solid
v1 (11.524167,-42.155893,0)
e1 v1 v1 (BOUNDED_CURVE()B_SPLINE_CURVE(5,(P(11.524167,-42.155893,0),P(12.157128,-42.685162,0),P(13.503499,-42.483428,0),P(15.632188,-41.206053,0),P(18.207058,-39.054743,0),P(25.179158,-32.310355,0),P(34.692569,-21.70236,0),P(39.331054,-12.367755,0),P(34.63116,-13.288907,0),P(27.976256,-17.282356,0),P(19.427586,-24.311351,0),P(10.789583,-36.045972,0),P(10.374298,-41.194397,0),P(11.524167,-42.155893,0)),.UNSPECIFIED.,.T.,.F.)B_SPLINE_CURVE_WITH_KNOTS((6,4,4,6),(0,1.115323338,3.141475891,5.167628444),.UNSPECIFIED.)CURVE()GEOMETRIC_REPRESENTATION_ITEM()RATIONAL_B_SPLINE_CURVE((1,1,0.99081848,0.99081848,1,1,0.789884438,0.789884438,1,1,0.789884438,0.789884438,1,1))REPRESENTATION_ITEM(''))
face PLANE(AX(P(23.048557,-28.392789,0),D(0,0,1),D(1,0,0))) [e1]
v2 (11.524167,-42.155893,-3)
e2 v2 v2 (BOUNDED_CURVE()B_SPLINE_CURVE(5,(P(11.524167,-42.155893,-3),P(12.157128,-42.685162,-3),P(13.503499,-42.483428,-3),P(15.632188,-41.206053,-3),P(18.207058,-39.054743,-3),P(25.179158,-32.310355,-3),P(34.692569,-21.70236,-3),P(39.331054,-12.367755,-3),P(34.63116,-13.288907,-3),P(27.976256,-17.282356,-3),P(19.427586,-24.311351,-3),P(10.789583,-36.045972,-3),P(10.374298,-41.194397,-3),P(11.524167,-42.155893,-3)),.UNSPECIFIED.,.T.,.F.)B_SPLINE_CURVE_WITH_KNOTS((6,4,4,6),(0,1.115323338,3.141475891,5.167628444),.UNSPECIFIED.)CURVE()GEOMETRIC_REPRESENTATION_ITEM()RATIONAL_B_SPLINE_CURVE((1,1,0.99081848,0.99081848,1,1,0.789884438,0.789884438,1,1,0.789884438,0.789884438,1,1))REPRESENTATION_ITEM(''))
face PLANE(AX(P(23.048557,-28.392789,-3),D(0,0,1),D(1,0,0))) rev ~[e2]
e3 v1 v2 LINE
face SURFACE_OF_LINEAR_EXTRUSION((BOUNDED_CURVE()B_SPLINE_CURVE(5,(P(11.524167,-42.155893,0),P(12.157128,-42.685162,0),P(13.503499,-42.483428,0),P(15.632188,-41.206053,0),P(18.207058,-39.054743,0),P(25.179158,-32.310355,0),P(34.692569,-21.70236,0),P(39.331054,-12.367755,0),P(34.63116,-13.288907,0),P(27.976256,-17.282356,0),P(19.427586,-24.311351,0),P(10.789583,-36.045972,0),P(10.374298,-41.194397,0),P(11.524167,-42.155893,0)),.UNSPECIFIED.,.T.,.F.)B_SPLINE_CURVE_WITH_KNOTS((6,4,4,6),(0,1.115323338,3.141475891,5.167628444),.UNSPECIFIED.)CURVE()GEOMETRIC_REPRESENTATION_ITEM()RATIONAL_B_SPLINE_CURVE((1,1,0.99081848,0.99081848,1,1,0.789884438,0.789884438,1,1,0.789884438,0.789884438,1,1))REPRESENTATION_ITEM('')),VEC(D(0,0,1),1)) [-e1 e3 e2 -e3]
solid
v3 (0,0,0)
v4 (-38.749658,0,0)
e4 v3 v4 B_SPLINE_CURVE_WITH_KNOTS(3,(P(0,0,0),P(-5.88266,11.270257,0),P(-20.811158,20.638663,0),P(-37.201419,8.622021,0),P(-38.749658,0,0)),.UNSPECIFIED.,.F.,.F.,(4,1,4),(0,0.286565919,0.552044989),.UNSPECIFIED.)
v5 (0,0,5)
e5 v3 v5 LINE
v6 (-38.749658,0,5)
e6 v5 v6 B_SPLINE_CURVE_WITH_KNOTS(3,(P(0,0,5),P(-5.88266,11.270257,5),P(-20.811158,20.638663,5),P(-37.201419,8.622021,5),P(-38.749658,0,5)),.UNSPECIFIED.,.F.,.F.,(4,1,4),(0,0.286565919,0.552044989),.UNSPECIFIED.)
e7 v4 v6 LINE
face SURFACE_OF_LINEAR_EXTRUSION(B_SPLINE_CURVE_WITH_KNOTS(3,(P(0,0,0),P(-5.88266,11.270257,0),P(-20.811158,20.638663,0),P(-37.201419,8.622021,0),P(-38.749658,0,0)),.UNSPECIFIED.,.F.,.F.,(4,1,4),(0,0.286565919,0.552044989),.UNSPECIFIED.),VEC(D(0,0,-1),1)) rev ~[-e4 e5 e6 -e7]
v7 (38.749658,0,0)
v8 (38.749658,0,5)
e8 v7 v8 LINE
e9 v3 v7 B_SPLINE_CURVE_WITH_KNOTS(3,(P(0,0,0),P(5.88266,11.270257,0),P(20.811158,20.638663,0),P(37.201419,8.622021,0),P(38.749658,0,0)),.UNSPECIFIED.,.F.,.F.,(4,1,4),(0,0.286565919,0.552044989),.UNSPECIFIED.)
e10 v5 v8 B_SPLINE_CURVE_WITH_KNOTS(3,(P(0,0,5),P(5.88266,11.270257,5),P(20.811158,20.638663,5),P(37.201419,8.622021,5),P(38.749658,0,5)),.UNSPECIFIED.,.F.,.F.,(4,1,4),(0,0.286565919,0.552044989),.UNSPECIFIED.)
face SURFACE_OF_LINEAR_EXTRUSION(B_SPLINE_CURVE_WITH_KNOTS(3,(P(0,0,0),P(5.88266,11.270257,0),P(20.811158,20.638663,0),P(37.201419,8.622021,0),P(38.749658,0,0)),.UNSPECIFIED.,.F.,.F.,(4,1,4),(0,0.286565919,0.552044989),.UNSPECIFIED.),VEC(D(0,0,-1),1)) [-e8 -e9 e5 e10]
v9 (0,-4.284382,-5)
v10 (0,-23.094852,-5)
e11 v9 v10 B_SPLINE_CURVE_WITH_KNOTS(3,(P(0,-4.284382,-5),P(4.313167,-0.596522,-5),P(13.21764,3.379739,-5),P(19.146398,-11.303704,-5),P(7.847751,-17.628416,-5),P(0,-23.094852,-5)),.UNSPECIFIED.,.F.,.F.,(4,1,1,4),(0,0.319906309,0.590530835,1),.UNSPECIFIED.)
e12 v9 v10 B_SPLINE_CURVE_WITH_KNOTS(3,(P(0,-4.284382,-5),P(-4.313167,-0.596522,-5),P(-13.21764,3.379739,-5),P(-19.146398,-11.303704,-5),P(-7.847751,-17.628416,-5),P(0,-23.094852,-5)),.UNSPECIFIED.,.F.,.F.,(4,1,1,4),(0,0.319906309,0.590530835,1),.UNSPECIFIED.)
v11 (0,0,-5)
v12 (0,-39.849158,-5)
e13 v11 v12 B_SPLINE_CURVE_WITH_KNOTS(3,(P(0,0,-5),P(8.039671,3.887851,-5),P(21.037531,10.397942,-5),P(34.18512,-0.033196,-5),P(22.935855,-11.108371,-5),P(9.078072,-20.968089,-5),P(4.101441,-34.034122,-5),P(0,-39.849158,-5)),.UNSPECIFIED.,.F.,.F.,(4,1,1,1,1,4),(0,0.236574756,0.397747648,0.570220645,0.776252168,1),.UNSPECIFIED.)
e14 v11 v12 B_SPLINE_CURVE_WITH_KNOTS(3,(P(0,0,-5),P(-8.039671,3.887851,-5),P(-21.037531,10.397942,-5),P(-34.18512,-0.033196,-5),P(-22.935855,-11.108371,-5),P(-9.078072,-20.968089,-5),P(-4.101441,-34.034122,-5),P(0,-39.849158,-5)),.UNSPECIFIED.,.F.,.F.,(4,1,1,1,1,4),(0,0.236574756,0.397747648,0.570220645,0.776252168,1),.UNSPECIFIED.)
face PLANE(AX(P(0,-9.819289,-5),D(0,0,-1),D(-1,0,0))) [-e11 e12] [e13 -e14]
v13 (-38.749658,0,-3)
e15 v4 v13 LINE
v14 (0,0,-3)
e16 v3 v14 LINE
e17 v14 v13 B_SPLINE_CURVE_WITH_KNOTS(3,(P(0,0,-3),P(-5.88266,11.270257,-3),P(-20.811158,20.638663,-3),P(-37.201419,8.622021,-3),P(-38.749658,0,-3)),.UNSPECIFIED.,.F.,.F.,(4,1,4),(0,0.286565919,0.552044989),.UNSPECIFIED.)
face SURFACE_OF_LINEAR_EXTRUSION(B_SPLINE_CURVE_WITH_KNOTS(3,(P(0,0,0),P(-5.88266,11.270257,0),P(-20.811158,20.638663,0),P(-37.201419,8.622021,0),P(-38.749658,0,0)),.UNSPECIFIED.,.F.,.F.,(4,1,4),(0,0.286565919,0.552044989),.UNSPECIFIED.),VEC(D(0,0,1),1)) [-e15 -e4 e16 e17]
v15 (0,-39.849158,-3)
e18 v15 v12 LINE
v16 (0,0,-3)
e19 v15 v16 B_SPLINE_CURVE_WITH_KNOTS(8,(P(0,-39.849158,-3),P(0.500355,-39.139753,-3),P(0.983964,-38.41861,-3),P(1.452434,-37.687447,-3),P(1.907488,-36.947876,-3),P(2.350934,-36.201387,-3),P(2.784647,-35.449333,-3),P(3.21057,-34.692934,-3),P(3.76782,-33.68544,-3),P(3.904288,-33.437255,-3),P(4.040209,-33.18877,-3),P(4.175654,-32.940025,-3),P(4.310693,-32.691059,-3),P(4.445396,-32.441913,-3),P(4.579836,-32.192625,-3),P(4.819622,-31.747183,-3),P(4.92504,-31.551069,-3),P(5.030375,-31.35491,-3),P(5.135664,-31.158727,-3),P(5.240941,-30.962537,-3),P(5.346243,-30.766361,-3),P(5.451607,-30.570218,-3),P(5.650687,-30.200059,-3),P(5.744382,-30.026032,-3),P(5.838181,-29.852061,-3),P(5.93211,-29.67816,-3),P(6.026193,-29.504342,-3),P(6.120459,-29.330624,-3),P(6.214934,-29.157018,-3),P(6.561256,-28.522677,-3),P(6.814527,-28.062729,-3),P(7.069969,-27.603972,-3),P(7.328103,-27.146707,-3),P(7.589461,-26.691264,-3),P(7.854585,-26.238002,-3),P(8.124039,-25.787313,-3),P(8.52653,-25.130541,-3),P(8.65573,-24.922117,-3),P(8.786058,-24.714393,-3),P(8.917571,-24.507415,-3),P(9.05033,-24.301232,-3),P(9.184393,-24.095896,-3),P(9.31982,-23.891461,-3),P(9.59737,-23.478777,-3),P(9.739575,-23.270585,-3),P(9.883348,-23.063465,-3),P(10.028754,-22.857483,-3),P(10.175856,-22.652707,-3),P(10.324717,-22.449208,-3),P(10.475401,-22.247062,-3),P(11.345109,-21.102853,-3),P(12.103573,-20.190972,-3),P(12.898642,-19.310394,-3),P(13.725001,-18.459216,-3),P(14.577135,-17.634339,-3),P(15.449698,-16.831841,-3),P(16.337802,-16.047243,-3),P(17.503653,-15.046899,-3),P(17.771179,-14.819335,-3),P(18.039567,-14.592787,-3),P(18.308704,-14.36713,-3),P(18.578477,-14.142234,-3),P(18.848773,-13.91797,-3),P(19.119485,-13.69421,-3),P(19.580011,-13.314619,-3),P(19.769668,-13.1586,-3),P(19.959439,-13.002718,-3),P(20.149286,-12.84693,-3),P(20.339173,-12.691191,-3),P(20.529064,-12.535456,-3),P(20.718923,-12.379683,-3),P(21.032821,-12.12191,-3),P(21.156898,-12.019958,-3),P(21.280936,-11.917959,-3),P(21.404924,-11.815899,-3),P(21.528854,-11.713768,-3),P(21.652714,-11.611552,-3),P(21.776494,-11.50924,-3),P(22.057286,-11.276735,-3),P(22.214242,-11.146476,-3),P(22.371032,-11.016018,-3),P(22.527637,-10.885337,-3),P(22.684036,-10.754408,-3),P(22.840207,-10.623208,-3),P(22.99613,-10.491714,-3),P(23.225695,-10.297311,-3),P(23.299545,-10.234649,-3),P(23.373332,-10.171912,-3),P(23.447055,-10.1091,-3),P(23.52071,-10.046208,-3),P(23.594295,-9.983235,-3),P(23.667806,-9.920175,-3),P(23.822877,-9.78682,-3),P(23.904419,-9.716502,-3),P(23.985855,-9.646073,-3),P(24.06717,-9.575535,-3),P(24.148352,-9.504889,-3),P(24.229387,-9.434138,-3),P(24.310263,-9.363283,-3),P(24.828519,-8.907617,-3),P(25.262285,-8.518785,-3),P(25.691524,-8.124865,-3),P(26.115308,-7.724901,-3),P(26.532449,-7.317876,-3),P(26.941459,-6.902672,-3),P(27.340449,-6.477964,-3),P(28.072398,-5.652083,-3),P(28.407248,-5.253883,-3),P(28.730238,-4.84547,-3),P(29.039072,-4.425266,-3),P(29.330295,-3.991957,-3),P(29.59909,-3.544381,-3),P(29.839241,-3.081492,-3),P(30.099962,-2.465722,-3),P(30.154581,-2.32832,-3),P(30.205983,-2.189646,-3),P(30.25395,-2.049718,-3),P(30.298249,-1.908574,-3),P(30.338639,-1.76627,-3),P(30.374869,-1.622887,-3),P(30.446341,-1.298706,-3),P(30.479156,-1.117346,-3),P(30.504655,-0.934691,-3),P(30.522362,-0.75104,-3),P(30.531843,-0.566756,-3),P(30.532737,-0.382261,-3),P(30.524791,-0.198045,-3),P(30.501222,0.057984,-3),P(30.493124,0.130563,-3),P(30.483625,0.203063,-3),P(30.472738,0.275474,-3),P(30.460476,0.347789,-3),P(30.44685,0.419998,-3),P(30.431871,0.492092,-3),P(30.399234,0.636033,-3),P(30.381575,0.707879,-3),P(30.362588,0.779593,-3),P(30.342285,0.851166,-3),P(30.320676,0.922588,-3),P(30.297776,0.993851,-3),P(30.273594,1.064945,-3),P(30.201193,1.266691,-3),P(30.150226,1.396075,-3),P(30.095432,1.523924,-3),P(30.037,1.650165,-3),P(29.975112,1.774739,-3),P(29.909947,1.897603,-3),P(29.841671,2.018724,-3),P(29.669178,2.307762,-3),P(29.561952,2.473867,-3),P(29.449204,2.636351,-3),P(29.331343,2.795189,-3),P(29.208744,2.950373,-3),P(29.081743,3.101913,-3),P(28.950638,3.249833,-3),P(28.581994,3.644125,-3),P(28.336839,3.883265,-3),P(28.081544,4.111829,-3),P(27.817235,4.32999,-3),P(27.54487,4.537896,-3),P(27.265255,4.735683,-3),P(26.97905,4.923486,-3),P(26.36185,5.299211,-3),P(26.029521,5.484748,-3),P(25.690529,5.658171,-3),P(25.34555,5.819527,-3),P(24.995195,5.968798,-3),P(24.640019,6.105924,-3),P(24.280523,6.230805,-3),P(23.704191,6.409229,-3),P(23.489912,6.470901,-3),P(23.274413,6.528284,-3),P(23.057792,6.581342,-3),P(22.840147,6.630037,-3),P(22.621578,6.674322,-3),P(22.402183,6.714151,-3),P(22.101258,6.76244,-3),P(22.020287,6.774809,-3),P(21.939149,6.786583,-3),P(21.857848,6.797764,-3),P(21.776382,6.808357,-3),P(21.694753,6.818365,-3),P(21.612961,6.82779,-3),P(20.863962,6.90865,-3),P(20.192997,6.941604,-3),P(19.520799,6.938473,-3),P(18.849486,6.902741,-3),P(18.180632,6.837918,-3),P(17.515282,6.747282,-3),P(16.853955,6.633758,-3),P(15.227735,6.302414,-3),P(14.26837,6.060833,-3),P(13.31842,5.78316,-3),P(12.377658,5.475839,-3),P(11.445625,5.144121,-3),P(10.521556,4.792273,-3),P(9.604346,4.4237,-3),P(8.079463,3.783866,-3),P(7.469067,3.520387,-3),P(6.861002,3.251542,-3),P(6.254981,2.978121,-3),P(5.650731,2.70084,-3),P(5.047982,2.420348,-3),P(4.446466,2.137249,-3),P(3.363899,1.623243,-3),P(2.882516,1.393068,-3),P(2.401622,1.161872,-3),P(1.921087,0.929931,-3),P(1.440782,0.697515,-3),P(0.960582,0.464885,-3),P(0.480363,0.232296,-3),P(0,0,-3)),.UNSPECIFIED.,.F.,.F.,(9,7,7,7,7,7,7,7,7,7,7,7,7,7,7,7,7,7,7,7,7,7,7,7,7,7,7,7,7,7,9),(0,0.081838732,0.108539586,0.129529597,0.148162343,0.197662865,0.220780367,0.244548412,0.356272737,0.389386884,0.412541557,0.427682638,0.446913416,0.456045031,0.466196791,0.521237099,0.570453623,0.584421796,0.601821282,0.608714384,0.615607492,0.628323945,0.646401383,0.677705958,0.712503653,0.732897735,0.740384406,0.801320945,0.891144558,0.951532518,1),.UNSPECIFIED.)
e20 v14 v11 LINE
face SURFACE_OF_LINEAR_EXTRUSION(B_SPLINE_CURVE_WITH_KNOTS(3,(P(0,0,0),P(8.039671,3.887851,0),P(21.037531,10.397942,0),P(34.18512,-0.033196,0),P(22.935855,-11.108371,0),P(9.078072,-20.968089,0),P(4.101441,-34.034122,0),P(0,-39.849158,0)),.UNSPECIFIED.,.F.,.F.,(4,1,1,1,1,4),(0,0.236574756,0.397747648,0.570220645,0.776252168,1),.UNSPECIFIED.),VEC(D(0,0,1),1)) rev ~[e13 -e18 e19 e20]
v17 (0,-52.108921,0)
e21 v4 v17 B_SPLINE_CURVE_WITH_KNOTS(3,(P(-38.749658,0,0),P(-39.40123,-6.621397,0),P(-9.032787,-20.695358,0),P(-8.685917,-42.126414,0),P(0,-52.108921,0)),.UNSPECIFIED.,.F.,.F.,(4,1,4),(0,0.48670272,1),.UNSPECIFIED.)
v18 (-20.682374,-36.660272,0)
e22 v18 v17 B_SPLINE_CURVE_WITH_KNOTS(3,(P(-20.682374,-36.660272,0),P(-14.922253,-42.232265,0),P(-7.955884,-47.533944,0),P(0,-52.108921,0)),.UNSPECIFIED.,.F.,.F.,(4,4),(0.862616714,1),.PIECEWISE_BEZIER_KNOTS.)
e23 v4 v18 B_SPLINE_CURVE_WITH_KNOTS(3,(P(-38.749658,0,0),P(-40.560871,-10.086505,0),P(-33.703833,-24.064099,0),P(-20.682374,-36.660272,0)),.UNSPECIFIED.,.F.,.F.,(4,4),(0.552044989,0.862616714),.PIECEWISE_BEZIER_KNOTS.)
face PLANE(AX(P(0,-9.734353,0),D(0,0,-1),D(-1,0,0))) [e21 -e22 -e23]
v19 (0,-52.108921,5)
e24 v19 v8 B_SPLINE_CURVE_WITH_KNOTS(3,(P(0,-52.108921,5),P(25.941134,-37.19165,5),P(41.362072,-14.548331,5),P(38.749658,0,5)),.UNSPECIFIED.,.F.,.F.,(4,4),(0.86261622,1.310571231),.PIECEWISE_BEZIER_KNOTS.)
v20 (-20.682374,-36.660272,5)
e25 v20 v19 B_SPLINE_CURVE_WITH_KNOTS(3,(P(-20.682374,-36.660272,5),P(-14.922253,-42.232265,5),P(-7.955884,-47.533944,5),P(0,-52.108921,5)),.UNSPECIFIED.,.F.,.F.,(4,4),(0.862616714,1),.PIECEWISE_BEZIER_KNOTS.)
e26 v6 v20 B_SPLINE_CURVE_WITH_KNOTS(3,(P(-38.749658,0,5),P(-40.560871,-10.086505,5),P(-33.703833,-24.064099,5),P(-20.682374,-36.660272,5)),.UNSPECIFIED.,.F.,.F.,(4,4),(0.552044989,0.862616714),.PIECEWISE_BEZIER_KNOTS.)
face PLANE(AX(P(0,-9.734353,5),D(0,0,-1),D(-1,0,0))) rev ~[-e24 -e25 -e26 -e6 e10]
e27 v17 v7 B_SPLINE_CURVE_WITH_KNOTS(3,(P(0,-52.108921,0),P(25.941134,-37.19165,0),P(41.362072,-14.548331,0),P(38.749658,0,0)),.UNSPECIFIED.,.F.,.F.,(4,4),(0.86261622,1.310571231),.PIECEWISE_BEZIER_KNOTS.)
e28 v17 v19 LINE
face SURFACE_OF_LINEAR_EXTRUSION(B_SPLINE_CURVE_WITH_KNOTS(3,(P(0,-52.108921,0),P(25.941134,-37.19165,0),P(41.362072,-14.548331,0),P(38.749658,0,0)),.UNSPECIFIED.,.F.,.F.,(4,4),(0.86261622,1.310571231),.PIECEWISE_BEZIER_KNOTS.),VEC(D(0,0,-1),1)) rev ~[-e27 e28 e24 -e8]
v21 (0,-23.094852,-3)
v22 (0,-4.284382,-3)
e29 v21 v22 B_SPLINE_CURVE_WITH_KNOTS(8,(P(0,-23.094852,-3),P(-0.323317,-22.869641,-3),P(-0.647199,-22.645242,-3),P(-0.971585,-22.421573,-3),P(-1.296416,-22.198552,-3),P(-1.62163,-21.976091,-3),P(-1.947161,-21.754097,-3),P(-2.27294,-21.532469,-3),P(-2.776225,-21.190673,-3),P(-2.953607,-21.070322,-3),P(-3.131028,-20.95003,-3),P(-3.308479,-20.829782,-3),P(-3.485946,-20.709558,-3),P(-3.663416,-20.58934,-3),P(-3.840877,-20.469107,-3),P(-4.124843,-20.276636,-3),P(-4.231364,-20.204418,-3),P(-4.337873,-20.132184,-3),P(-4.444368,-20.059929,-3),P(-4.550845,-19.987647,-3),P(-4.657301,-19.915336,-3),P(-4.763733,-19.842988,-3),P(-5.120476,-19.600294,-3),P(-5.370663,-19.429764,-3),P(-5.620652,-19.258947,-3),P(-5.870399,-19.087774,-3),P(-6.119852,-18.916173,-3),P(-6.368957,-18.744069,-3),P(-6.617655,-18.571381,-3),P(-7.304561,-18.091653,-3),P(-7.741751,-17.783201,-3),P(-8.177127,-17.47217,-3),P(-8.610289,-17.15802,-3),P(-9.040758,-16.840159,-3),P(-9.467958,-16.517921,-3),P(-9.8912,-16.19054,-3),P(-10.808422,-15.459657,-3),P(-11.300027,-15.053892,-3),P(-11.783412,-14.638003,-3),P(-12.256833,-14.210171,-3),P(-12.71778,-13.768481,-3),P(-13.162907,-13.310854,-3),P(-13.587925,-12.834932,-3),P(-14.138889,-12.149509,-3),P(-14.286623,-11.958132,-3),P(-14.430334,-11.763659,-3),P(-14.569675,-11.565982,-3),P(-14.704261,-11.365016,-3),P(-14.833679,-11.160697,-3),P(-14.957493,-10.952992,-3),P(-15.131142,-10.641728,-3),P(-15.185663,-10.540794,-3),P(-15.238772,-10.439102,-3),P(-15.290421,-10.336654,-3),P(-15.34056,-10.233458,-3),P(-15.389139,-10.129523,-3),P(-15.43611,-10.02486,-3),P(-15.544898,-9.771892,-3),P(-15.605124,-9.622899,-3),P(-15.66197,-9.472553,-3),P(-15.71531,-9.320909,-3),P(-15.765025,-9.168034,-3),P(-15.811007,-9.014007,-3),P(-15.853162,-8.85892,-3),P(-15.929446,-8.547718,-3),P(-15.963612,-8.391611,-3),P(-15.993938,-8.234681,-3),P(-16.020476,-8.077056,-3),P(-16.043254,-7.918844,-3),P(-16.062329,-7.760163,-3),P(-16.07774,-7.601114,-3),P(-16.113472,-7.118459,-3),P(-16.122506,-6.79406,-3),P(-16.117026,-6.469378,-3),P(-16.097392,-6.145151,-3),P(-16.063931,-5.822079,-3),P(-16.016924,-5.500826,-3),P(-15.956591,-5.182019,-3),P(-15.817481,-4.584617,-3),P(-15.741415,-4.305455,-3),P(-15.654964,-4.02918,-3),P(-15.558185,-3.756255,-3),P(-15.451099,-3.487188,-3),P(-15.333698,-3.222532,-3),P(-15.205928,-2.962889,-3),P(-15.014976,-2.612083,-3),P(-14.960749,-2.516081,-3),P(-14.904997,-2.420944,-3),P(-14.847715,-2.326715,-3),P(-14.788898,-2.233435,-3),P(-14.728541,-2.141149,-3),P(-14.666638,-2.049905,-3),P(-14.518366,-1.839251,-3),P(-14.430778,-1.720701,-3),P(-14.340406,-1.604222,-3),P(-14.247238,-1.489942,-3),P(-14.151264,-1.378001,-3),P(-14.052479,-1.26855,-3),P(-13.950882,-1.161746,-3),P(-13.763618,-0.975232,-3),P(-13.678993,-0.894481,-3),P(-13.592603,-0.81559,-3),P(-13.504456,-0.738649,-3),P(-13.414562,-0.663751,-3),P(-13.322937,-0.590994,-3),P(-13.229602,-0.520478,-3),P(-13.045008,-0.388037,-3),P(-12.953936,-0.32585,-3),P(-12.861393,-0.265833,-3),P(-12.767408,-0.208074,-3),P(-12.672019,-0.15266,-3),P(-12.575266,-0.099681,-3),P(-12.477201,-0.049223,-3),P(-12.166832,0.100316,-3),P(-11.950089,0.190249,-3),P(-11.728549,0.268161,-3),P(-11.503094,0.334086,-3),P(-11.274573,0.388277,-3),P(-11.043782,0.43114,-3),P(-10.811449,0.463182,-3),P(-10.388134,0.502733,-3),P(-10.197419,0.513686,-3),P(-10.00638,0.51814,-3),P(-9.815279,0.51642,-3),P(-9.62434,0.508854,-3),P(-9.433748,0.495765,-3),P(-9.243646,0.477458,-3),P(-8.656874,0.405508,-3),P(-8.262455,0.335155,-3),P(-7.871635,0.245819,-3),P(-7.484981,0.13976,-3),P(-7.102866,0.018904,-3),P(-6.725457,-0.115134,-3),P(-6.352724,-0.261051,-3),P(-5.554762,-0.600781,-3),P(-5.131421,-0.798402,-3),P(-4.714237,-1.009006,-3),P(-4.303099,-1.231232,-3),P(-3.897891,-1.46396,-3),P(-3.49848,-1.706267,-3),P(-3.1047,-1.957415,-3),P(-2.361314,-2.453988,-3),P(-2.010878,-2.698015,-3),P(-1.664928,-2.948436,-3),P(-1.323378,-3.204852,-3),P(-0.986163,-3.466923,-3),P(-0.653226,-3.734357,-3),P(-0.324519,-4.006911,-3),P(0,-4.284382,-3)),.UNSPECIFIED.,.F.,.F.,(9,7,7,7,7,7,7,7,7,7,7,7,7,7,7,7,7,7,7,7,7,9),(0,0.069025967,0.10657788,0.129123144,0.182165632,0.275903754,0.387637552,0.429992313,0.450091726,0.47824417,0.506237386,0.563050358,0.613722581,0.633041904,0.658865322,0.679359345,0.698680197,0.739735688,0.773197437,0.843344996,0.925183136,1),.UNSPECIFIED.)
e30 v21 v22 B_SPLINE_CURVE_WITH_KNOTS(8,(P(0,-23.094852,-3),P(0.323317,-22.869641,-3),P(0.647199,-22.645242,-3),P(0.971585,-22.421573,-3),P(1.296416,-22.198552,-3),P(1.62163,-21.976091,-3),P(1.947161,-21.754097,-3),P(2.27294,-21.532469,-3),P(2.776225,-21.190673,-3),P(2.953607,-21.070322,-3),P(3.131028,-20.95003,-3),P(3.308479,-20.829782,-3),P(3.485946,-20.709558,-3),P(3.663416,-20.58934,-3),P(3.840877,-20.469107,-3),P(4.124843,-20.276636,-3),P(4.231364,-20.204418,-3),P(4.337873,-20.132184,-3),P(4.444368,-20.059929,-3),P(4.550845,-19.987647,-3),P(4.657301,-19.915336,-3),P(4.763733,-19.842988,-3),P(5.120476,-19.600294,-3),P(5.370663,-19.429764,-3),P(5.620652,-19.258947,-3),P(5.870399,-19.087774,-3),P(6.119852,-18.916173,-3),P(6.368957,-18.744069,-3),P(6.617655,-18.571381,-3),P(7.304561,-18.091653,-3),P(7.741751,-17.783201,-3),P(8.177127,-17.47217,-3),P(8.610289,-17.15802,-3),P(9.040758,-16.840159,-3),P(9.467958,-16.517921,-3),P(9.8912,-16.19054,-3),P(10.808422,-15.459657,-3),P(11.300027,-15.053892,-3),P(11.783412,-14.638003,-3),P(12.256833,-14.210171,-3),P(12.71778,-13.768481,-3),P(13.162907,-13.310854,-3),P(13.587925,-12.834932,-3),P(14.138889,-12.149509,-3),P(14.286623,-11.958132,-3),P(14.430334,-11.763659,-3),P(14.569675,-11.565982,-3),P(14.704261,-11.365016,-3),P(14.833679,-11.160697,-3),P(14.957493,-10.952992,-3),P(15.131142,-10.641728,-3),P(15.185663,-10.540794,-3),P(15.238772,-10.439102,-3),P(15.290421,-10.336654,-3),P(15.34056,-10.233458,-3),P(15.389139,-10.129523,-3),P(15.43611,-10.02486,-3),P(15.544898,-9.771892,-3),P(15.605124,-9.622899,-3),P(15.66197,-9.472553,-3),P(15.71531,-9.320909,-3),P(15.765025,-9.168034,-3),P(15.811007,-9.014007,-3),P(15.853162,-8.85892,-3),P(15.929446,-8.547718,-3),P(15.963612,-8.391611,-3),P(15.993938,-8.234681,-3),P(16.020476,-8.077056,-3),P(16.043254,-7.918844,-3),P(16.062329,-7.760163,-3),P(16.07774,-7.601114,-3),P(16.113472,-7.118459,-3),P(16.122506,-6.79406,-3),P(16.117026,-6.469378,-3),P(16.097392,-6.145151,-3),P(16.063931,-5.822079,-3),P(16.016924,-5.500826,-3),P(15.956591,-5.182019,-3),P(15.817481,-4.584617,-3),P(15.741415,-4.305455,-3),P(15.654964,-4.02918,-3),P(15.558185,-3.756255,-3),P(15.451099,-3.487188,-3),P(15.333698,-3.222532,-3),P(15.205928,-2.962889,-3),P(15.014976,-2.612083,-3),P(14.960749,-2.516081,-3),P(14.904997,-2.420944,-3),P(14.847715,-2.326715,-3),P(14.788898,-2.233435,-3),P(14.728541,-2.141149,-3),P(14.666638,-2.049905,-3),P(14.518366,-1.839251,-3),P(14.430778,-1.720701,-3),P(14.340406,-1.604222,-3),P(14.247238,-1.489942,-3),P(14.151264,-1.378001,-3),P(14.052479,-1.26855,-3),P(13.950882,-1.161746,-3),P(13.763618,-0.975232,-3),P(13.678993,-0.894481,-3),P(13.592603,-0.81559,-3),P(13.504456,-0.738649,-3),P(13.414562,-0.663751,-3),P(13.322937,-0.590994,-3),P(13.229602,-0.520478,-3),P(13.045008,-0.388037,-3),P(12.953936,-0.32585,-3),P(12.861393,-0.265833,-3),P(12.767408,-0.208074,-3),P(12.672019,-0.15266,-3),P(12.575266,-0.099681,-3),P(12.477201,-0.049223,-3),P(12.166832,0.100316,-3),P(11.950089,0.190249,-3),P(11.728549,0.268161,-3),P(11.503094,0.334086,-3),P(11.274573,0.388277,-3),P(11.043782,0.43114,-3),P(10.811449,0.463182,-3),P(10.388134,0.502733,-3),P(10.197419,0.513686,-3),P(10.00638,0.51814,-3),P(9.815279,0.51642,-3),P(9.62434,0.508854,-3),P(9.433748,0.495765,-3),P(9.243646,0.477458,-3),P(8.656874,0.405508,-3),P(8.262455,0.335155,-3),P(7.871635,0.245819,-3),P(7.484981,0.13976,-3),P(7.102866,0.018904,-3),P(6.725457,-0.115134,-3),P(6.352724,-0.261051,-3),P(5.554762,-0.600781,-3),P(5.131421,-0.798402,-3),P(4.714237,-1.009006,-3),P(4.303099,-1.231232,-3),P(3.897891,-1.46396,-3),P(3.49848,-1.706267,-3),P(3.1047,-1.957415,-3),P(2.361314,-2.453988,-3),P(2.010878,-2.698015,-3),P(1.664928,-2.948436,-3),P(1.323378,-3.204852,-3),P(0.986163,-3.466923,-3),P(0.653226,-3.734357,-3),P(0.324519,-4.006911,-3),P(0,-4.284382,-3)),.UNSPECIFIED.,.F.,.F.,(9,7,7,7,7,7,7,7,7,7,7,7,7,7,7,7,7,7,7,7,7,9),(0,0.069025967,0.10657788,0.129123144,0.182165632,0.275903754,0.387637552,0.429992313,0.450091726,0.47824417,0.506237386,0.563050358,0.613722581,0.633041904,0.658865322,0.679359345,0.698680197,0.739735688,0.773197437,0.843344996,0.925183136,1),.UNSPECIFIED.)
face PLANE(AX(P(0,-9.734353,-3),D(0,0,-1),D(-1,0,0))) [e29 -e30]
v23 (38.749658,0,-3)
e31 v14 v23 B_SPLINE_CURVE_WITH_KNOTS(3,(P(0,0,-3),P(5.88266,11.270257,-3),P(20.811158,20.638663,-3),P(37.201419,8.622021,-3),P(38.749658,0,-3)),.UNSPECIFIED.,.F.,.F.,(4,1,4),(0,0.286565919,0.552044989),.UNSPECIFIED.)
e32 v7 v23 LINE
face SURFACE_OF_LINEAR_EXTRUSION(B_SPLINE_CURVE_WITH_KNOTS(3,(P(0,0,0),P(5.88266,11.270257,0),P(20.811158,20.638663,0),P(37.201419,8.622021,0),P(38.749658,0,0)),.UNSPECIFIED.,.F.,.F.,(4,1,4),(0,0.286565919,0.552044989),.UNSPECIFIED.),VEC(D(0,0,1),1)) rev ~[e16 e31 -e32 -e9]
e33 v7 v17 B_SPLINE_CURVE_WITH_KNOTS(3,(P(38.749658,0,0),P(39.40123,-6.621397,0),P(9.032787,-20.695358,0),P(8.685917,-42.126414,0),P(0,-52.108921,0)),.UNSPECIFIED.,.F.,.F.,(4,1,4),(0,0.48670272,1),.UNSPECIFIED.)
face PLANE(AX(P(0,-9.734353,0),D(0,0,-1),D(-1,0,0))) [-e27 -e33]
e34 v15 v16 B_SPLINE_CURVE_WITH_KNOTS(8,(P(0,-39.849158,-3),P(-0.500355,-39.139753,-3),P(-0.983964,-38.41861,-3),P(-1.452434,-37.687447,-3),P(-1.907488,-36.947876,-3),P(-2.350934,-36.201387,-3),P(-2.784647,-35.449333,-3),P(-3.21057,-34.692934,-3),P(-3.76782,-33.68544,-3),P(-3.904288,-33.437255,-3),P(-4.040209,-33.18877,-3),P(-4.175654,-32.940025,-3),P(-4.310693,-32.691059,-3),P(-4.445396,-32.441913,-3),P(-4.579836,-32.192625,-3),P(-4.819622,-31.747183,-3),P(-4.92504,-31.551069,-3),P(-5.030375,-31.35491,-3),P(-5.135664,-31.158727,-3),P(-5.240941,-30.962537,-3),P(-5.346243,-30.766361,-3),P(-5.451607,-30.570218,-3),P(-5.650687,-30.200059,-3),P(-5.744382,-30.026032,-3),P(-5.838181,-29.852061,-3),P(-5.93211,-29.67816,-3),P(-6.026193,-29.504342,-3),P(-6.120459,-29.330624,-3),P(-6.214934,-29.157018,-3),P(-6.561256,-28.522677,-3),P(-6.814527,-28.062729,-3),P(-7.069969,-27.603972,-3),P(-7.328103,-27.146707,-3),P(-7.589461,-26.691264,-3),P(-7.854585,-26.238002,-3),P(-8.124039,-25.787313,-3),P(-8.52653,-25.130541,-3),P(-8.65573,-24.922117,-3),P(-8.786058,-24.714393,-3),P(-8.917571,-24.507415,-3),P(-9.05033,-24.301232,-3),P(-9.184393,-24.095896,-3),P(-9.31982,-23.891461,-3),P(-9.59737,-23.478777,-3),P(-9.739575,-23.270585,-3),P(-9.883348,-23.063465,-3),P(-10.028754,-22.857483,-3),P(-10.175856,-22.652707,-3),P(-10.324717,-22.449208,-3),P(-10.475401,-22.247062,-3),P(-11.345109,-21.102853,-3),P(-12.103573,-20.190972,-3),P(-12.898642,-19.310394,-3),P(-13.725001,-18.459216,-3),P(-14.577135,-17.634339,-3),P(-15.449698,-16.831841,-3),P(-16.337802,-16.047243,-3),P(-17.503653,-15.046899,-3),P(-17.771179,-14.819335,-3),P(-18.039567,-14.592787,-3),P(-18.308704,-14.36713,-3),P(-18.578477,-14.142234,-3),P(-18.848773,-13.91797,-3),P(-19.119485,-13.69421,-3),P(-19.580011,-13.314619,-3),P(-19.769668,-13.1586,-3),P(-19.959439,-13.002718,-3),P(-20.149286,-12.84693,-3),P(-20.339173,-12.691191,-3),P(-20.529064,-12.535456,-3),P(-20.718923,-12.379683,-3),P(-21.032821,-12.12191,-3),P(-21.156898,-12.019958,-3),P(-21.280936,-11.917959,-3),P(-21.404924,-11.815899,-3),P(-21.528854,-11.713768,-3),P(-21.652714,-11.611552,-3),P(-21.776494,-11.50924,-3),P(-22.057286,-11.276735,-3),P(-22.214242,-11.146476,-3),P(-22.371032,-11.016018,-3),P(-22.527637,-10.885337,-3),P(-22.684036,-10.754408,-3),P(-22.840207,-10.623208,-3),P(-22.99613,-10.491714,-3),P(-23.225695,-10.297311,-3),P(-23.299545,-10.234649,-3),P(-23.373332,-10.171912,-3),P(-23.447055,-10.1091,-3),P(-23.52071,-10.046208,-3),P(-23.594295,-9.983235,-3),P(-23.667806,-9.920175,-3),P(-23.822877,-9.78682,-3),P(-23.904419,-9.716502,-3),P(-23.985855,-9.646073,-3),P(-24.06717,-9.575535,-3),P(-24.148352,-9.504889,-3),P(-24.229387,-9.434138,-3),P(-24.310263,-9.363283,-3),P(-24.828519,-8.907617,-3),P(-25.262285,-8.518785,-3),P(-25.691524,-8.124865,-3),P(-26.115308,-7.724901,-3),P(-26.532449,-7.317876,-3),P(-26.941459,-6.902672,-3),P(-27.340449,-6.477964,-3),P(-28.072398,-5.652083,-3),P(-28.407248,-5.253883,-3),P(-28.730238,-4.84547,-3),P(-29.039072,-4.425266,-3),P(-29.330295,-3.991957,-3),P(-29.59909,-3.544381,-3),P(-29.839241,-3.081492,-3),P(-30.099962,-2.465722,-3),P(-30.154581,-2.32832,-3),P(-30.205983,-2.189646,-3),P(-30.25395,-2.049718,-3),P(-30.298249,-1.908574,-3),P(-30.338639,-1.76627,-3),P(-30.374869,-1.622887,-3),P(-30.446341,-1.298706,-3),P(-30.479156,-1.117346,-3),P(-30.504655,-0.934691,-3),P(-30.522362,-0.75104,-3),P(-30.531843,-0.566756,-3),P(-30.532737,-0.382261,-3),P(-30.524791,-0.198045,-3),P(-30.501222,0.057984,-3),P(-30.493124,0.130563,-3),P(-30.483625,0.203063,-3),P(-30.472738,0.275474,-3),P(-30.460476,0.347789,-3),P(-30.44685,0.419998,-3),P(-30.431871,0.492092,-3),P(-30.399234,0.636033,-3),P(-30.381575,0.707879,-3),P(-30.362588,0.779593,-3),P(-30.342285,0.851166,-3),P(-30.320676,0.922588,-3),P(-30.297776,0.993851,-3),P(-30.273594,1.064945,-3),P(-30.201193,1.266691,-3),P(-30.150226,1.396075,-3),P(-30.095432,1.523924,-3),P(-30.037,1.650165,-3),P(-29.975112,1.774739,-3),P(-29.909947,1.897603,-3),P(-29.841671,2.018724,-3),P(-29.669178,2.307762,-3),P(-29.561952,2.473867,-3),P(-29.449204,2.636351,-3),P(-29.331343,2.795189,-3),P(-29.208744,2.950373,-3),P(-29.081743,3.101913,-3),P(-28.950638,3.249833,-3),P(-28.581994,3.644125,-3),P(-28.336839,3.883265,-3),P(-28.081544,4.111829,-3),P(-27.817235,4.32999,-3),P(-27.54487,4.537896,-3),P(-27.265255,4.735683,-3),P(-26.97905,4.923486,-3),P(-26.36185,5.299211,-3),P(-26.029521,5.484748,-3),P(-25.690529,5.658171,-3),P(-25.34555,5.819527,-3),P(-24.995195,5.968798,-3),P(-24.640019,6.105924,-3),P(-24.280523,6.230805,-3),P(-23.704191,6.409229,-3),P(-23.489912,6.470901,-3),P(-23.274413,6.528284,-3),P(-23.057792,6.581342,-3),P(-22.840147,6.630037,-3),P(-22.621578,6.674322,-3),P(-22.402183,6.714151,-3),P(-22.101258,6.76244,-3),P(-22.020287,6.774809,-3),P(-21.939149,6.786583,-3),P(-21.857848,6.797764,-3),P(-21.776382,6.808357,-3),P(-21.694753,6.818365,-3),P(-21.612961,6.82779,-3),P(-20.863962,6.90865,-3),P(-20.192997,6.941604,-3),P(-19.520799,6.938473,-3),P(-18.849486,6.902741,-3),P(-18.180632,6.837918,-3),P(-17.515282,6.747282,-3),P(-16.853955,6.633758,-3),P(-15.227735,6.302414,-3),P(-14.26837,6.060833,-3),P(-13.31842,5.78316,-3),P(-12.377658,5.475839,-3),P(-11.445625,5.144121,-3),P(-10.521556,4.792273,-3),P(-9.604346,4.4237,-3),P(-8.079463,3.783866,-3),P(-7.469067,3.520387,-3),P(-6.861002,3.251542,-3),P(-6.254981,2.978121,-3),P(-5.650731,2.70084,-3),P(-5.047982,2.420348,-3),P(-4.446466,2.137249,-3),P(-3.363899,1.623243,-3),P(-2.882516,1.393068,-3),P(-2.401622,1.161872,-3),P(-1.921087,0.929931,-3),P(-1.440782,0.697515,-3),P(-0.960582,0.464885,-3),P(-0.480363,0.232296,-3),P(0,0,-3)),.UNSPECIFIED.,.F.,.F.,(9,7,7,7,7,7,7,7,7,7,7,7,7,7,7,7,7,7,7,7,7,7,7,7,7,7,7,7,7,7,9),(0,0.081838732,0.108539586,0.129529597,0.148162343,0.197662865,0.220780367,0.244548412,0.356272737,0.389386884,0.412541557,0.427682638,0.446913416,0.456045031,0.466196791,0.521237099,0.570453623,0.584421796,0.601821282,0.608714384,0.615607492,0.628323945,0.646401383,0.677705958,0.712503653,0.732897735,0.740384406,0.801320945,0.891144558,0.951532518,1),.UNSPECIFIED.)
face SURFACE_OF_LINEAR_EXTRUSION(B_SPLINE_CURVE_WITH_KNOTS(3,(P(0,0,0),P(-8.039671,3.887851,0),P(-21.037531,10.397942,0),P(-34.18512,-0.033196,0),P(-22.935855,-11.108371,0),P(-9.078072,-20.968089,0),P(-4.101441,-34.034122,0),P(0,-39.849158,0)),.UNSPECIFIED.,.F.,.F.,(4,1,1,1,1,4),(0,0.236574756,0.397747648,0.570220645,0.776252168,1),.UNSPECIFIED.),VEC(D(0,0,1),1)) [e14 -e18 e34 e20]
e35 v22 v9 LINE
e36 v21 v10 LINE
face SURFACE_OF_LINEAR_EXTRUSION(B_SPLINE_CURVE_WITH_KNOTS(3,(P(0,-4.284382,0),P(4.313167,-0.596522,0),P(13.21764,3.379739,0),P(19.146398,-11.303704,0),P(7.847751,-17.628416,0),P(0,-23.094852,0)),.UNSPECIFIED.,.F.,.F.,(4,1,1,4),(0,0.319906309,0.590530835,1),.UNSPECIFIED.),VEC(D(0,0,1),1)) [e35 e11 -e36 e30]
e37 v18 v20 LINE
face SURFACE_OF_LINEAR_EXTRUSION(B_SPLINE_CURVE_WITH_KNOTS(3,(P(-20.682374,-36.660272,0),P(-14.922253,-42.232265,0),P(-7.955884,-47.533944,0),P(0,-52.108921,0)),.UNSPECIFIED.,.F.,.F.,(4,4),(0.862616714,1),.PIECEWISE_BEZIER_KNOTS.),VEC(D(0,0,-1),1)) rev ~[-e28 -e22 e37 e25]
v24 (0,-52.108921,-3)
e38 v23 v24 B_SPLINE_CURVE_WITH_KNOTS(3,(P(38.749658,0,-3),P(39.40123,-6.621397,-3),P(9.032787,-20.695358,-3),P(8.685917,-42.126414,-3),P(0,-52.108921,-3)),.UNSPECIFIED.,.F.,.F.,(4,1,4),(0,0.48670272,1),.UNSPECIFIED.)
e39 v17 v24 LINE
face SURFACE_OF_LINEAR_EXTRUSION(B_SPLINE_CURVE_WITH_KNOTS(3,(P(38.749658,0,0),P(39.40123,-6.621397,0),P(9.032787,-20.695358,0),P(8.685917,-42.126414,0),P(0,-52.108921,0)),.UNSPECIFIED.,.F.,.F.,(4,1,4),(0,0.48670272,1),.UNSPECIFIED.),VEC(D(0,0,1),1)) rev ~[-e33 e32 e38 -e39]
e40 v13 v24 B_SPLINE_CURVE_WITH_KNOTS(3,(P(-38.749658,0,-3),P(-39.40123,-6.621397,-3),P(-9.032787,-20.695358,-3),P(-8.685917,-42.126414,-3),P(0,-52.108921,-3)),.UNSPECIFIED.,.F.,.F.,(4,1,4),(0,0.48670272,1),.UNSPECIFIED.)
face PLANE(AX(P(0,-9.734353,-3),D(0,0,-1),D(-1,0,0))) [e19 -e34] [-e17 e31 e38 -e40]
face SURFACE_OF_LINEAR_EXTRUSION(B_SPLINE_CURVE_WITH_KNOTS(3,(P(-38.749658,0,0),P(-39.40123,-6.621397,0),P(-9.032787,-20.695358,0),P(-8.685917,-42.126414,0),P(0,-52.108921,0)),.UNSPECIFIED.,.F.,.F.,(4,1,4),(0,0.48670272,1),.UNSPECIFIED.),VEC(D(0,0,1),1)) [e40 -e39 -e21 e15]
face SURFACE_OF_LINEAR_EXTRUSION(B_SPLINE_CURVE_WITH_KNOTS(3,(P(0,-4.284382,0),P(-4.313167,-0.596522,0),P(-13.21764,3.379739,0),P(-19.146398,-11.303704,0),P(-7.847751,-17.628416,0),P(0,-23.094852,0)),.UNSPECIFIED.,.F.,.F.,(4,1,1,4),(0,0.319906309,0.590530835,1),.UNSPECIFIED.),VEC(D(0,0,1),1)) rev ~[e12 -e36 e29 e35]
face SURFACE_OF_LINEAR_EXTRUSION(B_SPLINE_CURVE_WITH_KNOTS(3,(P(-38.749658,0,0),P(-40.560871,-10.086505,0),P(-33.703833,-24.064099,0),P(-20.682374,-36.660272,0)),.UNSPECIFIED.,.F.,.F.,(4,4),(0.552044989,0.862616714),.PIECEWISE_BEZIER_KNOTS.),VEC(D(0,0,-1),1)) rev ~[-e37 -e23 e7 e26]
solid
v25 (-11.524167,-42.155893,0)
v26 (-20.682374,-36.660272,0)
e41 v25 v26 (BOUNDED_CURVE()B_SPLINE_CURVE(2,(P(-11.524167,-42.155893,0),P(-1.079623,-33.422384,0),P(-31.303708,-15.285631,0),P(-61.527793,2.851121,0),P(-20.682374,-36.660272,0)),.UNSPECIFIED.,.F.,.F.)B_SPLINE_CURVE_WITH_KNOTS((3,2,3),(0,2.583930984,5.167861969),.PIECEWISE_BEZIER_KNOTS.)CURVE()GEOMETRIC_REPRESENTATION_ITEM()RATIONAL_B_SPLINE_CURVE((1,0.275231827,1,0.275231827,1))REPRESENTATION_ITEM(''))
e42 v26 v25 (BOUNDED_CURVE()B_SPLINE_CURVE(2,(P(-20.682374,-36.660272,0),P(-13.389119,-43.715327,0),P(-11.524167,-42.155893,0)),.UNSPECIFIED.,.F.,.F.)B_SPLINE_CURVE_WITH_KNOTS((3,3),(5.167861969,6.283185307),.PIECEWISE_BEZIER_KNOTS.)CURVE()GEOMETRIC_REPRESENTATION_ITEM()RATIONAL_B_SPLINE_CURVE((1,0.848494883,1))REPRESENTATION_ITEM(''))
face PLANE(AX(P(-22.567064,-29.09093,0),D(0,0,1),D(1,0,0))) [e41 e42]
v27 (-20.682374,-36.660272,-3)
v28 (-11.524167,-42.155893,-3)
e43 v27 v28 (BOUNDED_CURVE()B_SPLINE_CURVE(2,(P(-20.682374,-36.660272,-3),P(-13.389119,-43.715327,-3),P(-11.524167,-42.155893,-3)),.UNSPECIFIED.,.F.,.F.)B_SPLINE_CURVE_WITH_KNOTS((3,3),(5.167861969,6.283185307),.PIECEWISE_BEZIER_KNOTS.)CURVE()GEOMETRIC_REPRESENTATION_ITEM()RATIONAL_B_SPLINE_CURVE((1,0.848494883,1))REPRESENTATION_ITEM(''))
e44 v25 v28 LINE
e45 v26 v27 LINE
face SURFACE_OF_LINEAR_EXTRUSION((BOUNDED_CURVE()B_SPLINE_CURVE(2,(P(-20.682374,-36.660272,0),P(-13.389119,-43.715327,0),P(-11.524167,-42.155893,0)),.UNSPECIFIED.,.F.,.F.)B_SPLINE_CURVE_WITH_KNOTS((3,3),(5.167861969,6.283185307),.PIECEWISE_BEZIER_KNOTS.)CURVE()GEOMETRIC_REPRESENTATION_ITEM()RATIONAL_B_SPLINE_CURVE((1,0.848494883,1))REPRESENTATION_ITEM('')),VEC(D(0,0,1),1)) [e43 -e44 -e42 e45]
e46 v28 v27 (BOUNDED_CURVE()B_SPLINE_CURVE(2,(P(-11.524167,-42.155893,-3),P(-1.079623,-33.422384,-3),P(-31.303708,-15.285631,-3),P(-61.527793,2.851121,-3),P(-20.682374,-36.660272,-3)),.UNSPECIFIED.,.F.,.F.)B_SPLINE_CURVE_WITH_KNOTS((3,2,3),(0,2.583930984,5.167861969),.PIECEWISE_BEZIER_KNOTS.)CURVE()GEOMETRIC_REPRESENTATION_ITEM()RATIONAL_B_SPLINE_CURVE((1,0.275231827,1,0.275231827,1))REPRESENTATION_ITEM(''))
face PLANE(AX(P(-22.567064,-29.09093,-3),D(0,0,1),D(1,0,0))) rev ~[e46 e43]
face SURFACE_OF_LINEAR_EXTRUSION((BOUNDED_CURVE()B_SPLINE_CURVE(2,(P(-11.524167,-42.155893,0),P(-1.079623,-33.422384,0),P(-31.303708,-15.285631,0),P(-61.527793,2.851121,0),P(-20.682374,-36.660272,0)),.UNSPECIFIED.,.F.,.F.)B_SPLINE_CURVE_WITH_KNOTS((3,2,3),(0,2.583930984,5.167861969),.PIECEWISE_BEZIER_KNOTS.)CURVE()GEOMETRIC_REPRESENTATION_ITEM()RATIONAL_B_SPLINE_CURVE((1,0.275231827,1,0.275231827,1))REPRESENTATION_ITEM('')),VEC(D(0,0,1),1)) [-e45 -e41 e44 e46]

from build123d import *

# Parameters (mm, degrees)
F1_DEPTH = 5
F2_DEPTH = 3
F3_DEPTH = 5


# Not quite as in the source:
# - a feature names something its author has since deleted; it is built from what else it names


with BuildPart() as f1:
    # F0 (on Top) → F1 (new body)
    with BuildSketch(Plane.XY):
        with BuildLine():
            add(Edge.make_bspline(
                [(0, 0), (5.8826601211, 11.2702567006), (20.8111578849, 20.6386629418), (37.2014190882, 8.6220207342), (38.749657821, 0)],
                knots=[0, 0, 0, 0, 0.2865659188, 0.5520449891, 0.5520449891, 0.5520449891, 0.5520449891], degree=3))
            add(Edge.make_bspline(
                [(0, 0), (-5.8826601211, 11.2702567006), (-20.8111578849, 20.6386629418), (-37.2014190882, 8.6220207342), (-38.749657821, 0)],
                knots=[0, 0, 0, 0, 0.2865659188, 0.5520449891, 0.5520449891, 0.5520449891, 0.5520449891], degree=3))
            add(Edge.make_bspline(
                [(-38.749657821, 0), (-39.4012299945, -6.6213969341), (-9.0327868439, -20.6953577001), (-8.685916815, -42.126413839), (0, -52.1089205623)],
                knots=[0, 0, 0, 0, 0.4867027196, 1, 1, 1, 1], degree=3))
            add(Edge.make_bspline(
                [(38.749657821, 0), (39.4012299945, -6.6213969341), (9.0327868439, -20.6953577001), (8.685916815, -42.126413839), (0, -52.1089205623)],
                knots=[0, 0, 0, 0, 0.4867027196, 1, 1, 1, 1], degree=3))
        make_face()
        with BuildLine():
            add(Edge.make_bspline(
                [(0, 0), (-8.039671318, 3.887850868), (-21.0375310132, 10.3979423013), (-34.1851204628, -0.0331959557), (-22.9358554941, -11.1083712256), (-9.0780722669, -20.9680892381), (-4.1014407761, -34.0341217816), (0, -39.8491583765)],
                knots=[0, 0, 0, 0, 0.236574756, 0.3977476477, 0.5702206455, 0.7762521683, 1, 1, 1, 1], degree=3))
            add(Edge.make_bspline(
                [(0, 0), (8.039671318, 3.887850868), (21.0375310132, 10.3979423013), (34.1851204628, -0.0331959557), (22.9358554941, -11.1083712256), (9.0780722669, -20.9680892381), (4.1014407761, -34.0341217816), (0, -39.8491583765)],
                knots=[0, 0, 0, 0, 0.236574756, 0.3977476477, 0.5702206455, 0.7762521683, 1, 1, 1, 1], degree=3))
        make_face(mode=Mode.SUBTRACT)
        with BuildLine():
            add(Edge.make_bspline(
                [(0, 0), (8.039671318, 3.887850868), (21.0375310132, 10.3979423013), (34.1851204628, -0.0331959557), (22.9358554941, -11.1083712256), (9.0780722669, -20.9680892381), (4.1014407761, -34.0341217816), (0, -39.8491583765)],
                knots=[0, 0, 0, 0, 0.236574756, 0.3977476477, 0.5702206455, 0.7762521683, 1, 1, 1, 1], degree=3))
            add(Edge.make_bspline(
                [(0, 0), (-8.039671318, 3.887850868), (-21.0375310132, 10.3979423013), (-34.1851204628, -0.0331959557), (-22.9358554941, -11.1083712256), (-9.0780722669, -20.9680892381), (-4.1014407761, -34.0341217816), (0, -39.8491583765)],
                knots=[0, 0, 0, 0, 0.236574756, 0.3977476477, 0.5702206455, 0.7762521683, 1, 1, 1, 1], degree=3))
        make_face()
        with BuildLine():
            add(Edge.make_bspline(
                [(0, -4.2843823321), (-4.3131672708, -0.5965221259), (-13.217639527, 3.3797390078), (-19.1463981552, -11.3037035401), (-7.8477509016, -17.6284155745), (0, -23.0948515236)],
                knots=[0, 0, 0, 0, 0.3199063089, 0.5905308347, 1, 1, 1, 1], degree=3))
            add(Edge.make_bspline(
                [(0, -4.2843823321), (4.3131672708, -0.5965221259), (13.217639527, 3.3797390078), (19.1463981552, -11.3037035401), (7.8477509016, -17.6284155745), (0, -23.0948515236)],
                knots=[0, 0, 0, 0, 0.3199063089, 0.5905308347, 1, 1, 1, 1], degree=3))
        make_face(mode=Mode.SUBTRACT)
        with BuildLine():
            add(Edge.make_bspline(
                [(0, -4.2843823321), (4.3131672708, -0.5965221259), (13.217639527, 3.3797390078), (19.1463981552, -11.3037035401), (7.8477509016, -17.6284155745), (0, -23.0948515236)],
                knots=[0, 0, 0, 0, 0.3199063089, 0.5905308347, 1, 1, 1, 1], degree=3))
            add(Edge.make_bspline(
                [(0, -4.2843823321), (-4.3131672708, -0.5965221259), (-13.217639527, 3.3797390078), (-19.1463981552, -11.3037035401), (-7.8477509016, -17.6284155745), (0, -23.0948515236)],
                knots=[0, 0, 0, 0, 0.3199063089, 0.5905308347, 1, 1, 1, 1], degree=3))
        make_face()
        with BuildLine():
            add(Edge.make_bspline(
                [(-38.749657821, 0), (-39.4012299945, -6.6213969341), (-9.0327868439, -20.6953577001), (-8.685916815, -42.126413839), (0, -52.1089205623)],
                knots=[0, 0, 0, 0, 0.4867027196, 1, 1, 1, 1], degree=3))
            add(Edge.make_bspline(
                [(-38.749657821, 0), (-40.5608709324, -10.0865045363), (-33.7038328837, -24.0640985889), (-20.6823740602, -36.6602716931)],
                knots=[0.5520449891, 0.5520449891, 0.5520449891, 0.5520449891, 0.8626167135, 0.8626167135, 0.8626167135, 0.8626167135], degree=3))
            add(Edge.make_bspline(
                [(-20.6823740602, -36.6602716931), (-14.9222527489, -42.2322652862), (-7.9558844229, -47.5339439616), (0, -52.1089205623)],
                knots=[0.8626167135, 0.8626167135, 0.8626167135, 0.8626167135, 1, 1, 1, 1], degree=3))
        make_face()
        with BuildLine():
            add(Edge.make_bspline(
                [(-20.6823740602, -36.6602716931), (-13.3891185223, -43.7153269099), (-11.5241668889, -42.155893369)],
                knots=[5.1678619688, 5.1678619688, 5.1678619688, 6.2831853072, 6.2831853072, 6.2831853072], degree=2, weights=[1, 0.8484948826, 1]))
            add(Edge.make_bspline(
                [(-11.5241668889, -42.155893369), (-1.0796225414, -33.4223838863), (-31.3037078069, -15.2856312429), (-61.5277930724, 2.8511214004), (-20.6823740602, -36.6602716931)],
                knots=[0, 0, 0, 2.5839309844, 2.5839309844, 5.1678619688, 5.1678619688, 5.1678619688], degree=2, weights=[1, 0.2752318272, 1, 0.2752318272, 1]))
        make_face(mode=Mode.SUBTRACT)
        with BuildLine():
            add(Edge.make_bspline(
                [(38.749657821, 0), (40.5608709326, -10.0865045375), (33.7038328821, -24.0640985922), (20.6823740557, -36.6602716974)],
                knots=[0.5520449891, 0.5520449891, 0.5520449891, 0.5520449891, 0.8626167135, 0.8626167135, 0.8626167135, 0.8626167135], degree=3))
            add(Edge.make_bspline(
                [(38.749657821, 0), (39.4012299945, -6.6213969341), (9.0327868439, -20.6953577001), (8.685916815, -42.126413839), (0, -52.1089205623)],
                knots=[0, 0, 0, 0, 0.4867027196, 1, 1, 1, 1], degree=3))
            add(Edge.make_bspline(
                [(20.6823740557, -36.6602716974), (14.9222527452, -42.232265289), (7.9558844208, -47.5339439628), (0, -52.1089205623)],
                knots=[0.8626167135, 0.8626167135, 0.8626167135, 0.8626167135, 1, 1, 1, 1], degree=3))
        make_face()
        with BuildLine():
            add(Edge.make_bspline(
                [(20.6823740557, -36.6602716974), (61.5277930795, 2.8511213993), (31.3037078086, -15.2856312419), (1.0796225376, -33.4223838832), (11.5241668889, -42.155893369)],
                knots=[1.115323338, 1.115323338, 1.115323338, 3.6992543226, 3.6992543226, 6.2831853072, 6.2831853072, 6.2831853072], degree=2, weights=[1, 0.2752318271, 1, 0.2752318271, 1]))
            add(Edge.make_bspline(
                [(11.5241668889, -42.155893369), (13.3891185215, -43.7153269093), (20.6823740557, -36.6602716974)],
                knots=[0, 0, 0, 1.115323338, 1.115323338, 1.115323338], degree=2, weights=[1, 0.8484948827, 1]))
        make_face(mode=Mode.SUBTRACT)
        with BuildLine():
            add(Edge.make_bspline(
                [(-11.5241668889, -42.155893369), (-1.0796225414, -33.4223838863), (-31.3037078069, -15.2856312429), (-61.5277930724, 2.8511214004), (-20.6823740602, -36.6602716931)],
                knots=[0, 0, 0, 2.5839309844, 2.5839309844, 5.1678619688, 5.1678619688, 5.1678619688], degree=2, weights=[1, 0.2752318272, 1, 0.2752318272, 1]))
            add(Edge.make_bspline(
                [(-20.6823740602, -36.6602716931), (-13.3891185223, -43.7153269099), (-11.5241668889, -42.155893369)],
                knots=[5.1678619688, 5.1678619688, 5.1678619688, 6.2831853072, 6.2831853072, 6.2831853072], degree=2, weights=[1, 0.8484948826, 1]))
        make_face()
        with BuildLine():
            add(Edge.make_bspline(
                [(11.5241668889, -42.155893369), (13.3891185215, -43.7153269093), (20.6823740557, -36.6602716974)],
                knots=[0, 0, 0, 1.115323338, 1.115323338, 1.115323338], degree=2, weights=[1, 0.8484948827, 1]))
            add(Edge.make_bspline(
                [(20.6823740557, -36.6602716974), (61.5277930795, 2.8511213993), (31.3037078086, -15.2856312419), (1.0796225376, -33.4223838832), (11.5241668889, -42.155893369)],
                knots=[1.115323338, 1.115323338, 1.115323338, 3.6992543226, 3.6992543226, 6.2831853072, 6.2831853072, 6.2831853072], degree=2, weights=[1, 0.2752318271, 1, 0.2752318271, 1]))
        make_face()
    extrude(amount=F1_DEPTH)

    # F0 (on Top) → F2 (join)
    with BuildSketch(Plane.XY):
        with BuildLine():
            add(Edge.make_bspline(
                [(0, 0), (5.8826601211, 11.2702567006), (20.8111578849, 20.6386629418), (37.2014190882, 8.6220207342), (38.749657821, 0)],
                knots=[0, 0, 0, 0, 0.2865659188, 0.5520449891, 0.5520449891, 0.5520449891, 0.5520449891], degree=3))
            add(Edge.make_bspline(
                [(0, 0), (-5.8826601211, 11.2702567006), (-20.8111578849, 20.6386629418), (-37.2014190882, 8.6220207342), (-38.749657821, 0)],
                knots=[0, 0, 0, 0, 0.2865659188, 0.5520449891, 0.5520449891, 0.5520449891, 0.5520449891], degree=3))
            add(Edge.make_bspline(
                [(-38.749657821, 0), (-39.4012299945, -6.6213969341), (-9.0327868439, -20.6953577001), (-8.685916815, -42.126413839), (0, -52.1089205623)],
                knots=[0, 0, 0, 0, 0.4867027196, 1, 1, 1, 1], degree=3))
            add(Edge.make_bspline(
                [(38.749657821, 0), (39.4012299945, -6.6213969341), (9.0327868439, -20.6953577001), (8.685916815, -42.126413839), (0, -52.1089205623)],
                knots=[0, 0, 0, 0, 0.4867027196, 1, 1, 1, 1], degree=3))
        make_face()
        with BuildLine():
            add(Edge.make_bspline(
                [(0, 0), (-8.039671318, 3.887850868), (-21.0375310132, 10.3979423013), (-34.1851204628, -0.0331959557), (-22.9358554941, -11.1083712256), (-9.0780722669, -20.9680892381), (-4.1014407761, -34.0341217816), (0, -39.8491583765)],
                knots=[0, 0, 0, 0, 0.236574756, 0.3977476477, 0.5702206455, 0.7762521683, 1, 1, 1, 1], degree=3))
            add(Edge.make_bspline(
                [(0, 0), (8.039671318, 3.887850868), (21.0375310132, 10.3979423013), (34.1851204628, -0.0331959557), (22.9358554941, -11.1083712256), (9.0780722669, -20.9680892381), (4.1014407761, -34.0341217816), (0, -39.8491583765)],
                knots=[0, 0, 0, 0, 0.236574756, 0.3977476477, 0.5702206455, 0.7762521683, 1, 1, 1, 1], degree=3))
        make_face(mode=Mode.SUBTRACT)
        with BuildLine():
            add(Edge.make_bspline(
                [(0, 0), (8.039671318, 3.887850868), (21.0375310132, 10.3979423013), (34.1851204628, -0.0331959557), (22.9358554941, -11.1083712256), (9.0780722669, -20.9680892381), (4.1014407761, -34.0341217816), (0, -39.8491583765)],
                knots=[0, 0, 0, 0, 0.236574756, 0.3977476477, 0.5702206455, 0.7762521683, 1, 1, 1, 1], degree=3))
            add(Edge.make_bspline(
                [(0, 0), (-8.039671318, 3.887850868), (-21.0375310132, 10.3979423013), (-34.1851204628, -0.0331959557), (-22.9358554941, -11.1083712256), (-9.0780722669, -20.9680892381), (-4.1014407761, -34.0341217816), (0, -39.8491583765)],
                knots=[0, 0, 0, 0, 0.236574756, 0.3977476477, 0.5702206455, 0.7762521683, 1, 1, 1, 1], degree=3))
        make_face()
        with BuildLine():
            add(Edge.make_bspline(
                [(0, -4.2843823321), (-4.3131672708, -0.5965221259), (-13.217639527, 3.3797390078), (-19.1463981552, -11.3037035401), (-7.8477509016, -17.6284155745), (0, -23.0948515236)],
                knots=[0, 0, 0, 0, 0.3199063089, 0.5905308347, 1, 1, 1, 1], degree=3))
            add(Edge.make_bspline(
                [(0, -4.2843823321), (4.3131672708, -0.5965221259), (13.217639527, 3.3797390078), (19.1463981552, -11.3037035401), (7.8477509016, -17.6284155745), (0, -23.0948515236)],
                knots=[0, 0, 0, 0, 0.3199063089, 0.5905308347, 1, 1, 1, 1], degree=3))
        make_face(mode=Mode.SUBTRACT)
        with BuildLine():
            add(Edge.make_bspline(
                [(0, -4.2843823321), (4.3131672708, -0.5965221259), (13.217639527, 3.3797390078), (19.1463981552, -11.3037035401), (7.8477509016, -17.6284155745), (0, -23.0948515236)],
                knots=[0, 0, 0, 0, 0.3199063089, 0.5905308347, 1, 1, 1, 1], degree=3))
            add(Edge.make_bspline(
                [(0, -4.2843823321), (-4.3131672708, -0.5965221259), (-13.217639527, 3.3797390078), (-19.1463981552, -11.3037035401), (-7.8477509016, -17.6284155745), (0, -23.0948515236)],
                knots=[0, 0, 0, 0, 0.3199063089, 0.5905308347, 1, 1, 1, 1], degree=3))
        make_face()
    extrude(amount=-F2_DEPTH)

    # F0 (on Top) → F3 (join)
    with BuildSketch(Plane.XY):
        with BuildLine():
            add(Edge.make_bspline(
                [(0, 0), (8.039671318, 3.887850868), (21.0375310132, 10.3979423013), (34.1851204628, -0.0331959557), (22.9358554941, -11.1083712256), (9.0780722669, -20.9680892381), (4.1014407761, -34.0341217816), (0, -39.8491583765)],
                knots=[0, 0, 0, 0, 0.236574756, 0.3977476477, 0.5702206455, 0.7762521683, 1, 1, 1, 1], degree=3))
            add(Edge.make_bspline(
                [(0, 0), (-8.039671318, 3.887850868), (-21.0375310132, 10.3979423013), (-34.1851204628, -0.0331959557), (-22.9358554941, -11.1083712256), (-9.0780722669, -20.9680892381), (-4.1014407761, -34.0341217816), (0, -39.8491583765)],
                knots=[0, 0, 0, 0, 0.236574756, 0.3977476477, 0.5702206455, 0.7762521683, 1, 1, 1, 1], degree=3))
        make_face()
        with BuildLine():
            add(Edge.make_bspline(
                [(0, -4.2843823321), (-4.3131672708, -0.5965221259), (-13.217639527, 3.3797390078), (-19.1463981552, -11.3037035401), (-7.8477509016, -17.6284155745), (0, -23.0948515236)],
                knots=[0, 0, 0, 0, 0.3199063089, 0.5905308347, 1, 1, 1, 1], degree=3))
            add(Edge.make_bspline(
                [(0, -4.2843823321), (4.3131672708, -0.5965221259), (13.217639527, 3.3797390078), (19.1463981552, -11.3037035401), (7.8477509016, -17.6284155745), (0, -23.0948515236)],
                knots=[0, 0, 0, 0, 0.3199063089, 0.5905308347, 1, 1, 1, 1], degree=3))
        make_face(mode=Mode.SUBTRACT)
    extrude(amount=-F3_DEPTH)


with BuildPart() as f2:
    # F0 (on Top) → F2, piece 2 (new body)
    with BuildSketch(Plane.XY):
        with BuildLine():
            add(Edge.make_bspline(
                [(11.5241668889, -42.155893369), (13.3891185215, -43.7153269093), (20.6823740557, -36.6602716974)],
                knots=[0, 0, 0, 1.115323338, 1.115323338, 1.115323338], degree=2, weights=[1, 0.8484948827, 1]))
            add(Edge.make_bspline(
                [(20.6823740557, -36.6602716974), (61.5277930795, 2.8511213993), (31.3037078086, -15.2856312419), (1.0796225376, -33.4223838832), (11.5241668889, -42.155893369)],
                knots=[1.115323338, 1.115323338, 1.115323338, 3.6992543226, 3.6992543226, 6.2831853072, 6.2831853072, 6.2831853072], degree=2, weights=[1, 0.2752318271, 1, 0.2752318271, 1]))
        make_face()
    extrude(amount=-F2_DEPTH)


with BuildPart() as f2b:
    # F0 (on Top) → F2, piece 3 (new body)
    with BuildSketch(Plane.XY):
        with BuildLine():
            add(Edge.make_bspline(
                [(-11.5241668889, -42.155893369), (-1.0796225414, -33.4223838863), (-31.3037078069, -15.2856312429), (-61.5277930724, 2.8511214004), (-20.6823740602, -36.6602716931)],
                knots=[0, 0, 0, 2.5839309844, 2.5839309844, 5.1678619688, 5.1678619688, 5.1678619688], degree=2, weights=[1, 0.2752318272, 1, 0.2752318272, 1]))
            add(Edge.make_bspline(
                [(-20.6823740602, -36.6602716931), (-13.3891185223, -43.7153269099), (-11.5241668889, -42.155893369)],
                knots=[5.1678619688, 5.1678619688, 5.1678619688, 6.2831853072, 6.2831853072, 6.2831853072], degree=2, weights=[1, 0.8484948826, 1]))
        make_face()
    extrude(amount=-F2_DEPTH)


solid = Compound([f1.part, f2.part, f2b.part])
